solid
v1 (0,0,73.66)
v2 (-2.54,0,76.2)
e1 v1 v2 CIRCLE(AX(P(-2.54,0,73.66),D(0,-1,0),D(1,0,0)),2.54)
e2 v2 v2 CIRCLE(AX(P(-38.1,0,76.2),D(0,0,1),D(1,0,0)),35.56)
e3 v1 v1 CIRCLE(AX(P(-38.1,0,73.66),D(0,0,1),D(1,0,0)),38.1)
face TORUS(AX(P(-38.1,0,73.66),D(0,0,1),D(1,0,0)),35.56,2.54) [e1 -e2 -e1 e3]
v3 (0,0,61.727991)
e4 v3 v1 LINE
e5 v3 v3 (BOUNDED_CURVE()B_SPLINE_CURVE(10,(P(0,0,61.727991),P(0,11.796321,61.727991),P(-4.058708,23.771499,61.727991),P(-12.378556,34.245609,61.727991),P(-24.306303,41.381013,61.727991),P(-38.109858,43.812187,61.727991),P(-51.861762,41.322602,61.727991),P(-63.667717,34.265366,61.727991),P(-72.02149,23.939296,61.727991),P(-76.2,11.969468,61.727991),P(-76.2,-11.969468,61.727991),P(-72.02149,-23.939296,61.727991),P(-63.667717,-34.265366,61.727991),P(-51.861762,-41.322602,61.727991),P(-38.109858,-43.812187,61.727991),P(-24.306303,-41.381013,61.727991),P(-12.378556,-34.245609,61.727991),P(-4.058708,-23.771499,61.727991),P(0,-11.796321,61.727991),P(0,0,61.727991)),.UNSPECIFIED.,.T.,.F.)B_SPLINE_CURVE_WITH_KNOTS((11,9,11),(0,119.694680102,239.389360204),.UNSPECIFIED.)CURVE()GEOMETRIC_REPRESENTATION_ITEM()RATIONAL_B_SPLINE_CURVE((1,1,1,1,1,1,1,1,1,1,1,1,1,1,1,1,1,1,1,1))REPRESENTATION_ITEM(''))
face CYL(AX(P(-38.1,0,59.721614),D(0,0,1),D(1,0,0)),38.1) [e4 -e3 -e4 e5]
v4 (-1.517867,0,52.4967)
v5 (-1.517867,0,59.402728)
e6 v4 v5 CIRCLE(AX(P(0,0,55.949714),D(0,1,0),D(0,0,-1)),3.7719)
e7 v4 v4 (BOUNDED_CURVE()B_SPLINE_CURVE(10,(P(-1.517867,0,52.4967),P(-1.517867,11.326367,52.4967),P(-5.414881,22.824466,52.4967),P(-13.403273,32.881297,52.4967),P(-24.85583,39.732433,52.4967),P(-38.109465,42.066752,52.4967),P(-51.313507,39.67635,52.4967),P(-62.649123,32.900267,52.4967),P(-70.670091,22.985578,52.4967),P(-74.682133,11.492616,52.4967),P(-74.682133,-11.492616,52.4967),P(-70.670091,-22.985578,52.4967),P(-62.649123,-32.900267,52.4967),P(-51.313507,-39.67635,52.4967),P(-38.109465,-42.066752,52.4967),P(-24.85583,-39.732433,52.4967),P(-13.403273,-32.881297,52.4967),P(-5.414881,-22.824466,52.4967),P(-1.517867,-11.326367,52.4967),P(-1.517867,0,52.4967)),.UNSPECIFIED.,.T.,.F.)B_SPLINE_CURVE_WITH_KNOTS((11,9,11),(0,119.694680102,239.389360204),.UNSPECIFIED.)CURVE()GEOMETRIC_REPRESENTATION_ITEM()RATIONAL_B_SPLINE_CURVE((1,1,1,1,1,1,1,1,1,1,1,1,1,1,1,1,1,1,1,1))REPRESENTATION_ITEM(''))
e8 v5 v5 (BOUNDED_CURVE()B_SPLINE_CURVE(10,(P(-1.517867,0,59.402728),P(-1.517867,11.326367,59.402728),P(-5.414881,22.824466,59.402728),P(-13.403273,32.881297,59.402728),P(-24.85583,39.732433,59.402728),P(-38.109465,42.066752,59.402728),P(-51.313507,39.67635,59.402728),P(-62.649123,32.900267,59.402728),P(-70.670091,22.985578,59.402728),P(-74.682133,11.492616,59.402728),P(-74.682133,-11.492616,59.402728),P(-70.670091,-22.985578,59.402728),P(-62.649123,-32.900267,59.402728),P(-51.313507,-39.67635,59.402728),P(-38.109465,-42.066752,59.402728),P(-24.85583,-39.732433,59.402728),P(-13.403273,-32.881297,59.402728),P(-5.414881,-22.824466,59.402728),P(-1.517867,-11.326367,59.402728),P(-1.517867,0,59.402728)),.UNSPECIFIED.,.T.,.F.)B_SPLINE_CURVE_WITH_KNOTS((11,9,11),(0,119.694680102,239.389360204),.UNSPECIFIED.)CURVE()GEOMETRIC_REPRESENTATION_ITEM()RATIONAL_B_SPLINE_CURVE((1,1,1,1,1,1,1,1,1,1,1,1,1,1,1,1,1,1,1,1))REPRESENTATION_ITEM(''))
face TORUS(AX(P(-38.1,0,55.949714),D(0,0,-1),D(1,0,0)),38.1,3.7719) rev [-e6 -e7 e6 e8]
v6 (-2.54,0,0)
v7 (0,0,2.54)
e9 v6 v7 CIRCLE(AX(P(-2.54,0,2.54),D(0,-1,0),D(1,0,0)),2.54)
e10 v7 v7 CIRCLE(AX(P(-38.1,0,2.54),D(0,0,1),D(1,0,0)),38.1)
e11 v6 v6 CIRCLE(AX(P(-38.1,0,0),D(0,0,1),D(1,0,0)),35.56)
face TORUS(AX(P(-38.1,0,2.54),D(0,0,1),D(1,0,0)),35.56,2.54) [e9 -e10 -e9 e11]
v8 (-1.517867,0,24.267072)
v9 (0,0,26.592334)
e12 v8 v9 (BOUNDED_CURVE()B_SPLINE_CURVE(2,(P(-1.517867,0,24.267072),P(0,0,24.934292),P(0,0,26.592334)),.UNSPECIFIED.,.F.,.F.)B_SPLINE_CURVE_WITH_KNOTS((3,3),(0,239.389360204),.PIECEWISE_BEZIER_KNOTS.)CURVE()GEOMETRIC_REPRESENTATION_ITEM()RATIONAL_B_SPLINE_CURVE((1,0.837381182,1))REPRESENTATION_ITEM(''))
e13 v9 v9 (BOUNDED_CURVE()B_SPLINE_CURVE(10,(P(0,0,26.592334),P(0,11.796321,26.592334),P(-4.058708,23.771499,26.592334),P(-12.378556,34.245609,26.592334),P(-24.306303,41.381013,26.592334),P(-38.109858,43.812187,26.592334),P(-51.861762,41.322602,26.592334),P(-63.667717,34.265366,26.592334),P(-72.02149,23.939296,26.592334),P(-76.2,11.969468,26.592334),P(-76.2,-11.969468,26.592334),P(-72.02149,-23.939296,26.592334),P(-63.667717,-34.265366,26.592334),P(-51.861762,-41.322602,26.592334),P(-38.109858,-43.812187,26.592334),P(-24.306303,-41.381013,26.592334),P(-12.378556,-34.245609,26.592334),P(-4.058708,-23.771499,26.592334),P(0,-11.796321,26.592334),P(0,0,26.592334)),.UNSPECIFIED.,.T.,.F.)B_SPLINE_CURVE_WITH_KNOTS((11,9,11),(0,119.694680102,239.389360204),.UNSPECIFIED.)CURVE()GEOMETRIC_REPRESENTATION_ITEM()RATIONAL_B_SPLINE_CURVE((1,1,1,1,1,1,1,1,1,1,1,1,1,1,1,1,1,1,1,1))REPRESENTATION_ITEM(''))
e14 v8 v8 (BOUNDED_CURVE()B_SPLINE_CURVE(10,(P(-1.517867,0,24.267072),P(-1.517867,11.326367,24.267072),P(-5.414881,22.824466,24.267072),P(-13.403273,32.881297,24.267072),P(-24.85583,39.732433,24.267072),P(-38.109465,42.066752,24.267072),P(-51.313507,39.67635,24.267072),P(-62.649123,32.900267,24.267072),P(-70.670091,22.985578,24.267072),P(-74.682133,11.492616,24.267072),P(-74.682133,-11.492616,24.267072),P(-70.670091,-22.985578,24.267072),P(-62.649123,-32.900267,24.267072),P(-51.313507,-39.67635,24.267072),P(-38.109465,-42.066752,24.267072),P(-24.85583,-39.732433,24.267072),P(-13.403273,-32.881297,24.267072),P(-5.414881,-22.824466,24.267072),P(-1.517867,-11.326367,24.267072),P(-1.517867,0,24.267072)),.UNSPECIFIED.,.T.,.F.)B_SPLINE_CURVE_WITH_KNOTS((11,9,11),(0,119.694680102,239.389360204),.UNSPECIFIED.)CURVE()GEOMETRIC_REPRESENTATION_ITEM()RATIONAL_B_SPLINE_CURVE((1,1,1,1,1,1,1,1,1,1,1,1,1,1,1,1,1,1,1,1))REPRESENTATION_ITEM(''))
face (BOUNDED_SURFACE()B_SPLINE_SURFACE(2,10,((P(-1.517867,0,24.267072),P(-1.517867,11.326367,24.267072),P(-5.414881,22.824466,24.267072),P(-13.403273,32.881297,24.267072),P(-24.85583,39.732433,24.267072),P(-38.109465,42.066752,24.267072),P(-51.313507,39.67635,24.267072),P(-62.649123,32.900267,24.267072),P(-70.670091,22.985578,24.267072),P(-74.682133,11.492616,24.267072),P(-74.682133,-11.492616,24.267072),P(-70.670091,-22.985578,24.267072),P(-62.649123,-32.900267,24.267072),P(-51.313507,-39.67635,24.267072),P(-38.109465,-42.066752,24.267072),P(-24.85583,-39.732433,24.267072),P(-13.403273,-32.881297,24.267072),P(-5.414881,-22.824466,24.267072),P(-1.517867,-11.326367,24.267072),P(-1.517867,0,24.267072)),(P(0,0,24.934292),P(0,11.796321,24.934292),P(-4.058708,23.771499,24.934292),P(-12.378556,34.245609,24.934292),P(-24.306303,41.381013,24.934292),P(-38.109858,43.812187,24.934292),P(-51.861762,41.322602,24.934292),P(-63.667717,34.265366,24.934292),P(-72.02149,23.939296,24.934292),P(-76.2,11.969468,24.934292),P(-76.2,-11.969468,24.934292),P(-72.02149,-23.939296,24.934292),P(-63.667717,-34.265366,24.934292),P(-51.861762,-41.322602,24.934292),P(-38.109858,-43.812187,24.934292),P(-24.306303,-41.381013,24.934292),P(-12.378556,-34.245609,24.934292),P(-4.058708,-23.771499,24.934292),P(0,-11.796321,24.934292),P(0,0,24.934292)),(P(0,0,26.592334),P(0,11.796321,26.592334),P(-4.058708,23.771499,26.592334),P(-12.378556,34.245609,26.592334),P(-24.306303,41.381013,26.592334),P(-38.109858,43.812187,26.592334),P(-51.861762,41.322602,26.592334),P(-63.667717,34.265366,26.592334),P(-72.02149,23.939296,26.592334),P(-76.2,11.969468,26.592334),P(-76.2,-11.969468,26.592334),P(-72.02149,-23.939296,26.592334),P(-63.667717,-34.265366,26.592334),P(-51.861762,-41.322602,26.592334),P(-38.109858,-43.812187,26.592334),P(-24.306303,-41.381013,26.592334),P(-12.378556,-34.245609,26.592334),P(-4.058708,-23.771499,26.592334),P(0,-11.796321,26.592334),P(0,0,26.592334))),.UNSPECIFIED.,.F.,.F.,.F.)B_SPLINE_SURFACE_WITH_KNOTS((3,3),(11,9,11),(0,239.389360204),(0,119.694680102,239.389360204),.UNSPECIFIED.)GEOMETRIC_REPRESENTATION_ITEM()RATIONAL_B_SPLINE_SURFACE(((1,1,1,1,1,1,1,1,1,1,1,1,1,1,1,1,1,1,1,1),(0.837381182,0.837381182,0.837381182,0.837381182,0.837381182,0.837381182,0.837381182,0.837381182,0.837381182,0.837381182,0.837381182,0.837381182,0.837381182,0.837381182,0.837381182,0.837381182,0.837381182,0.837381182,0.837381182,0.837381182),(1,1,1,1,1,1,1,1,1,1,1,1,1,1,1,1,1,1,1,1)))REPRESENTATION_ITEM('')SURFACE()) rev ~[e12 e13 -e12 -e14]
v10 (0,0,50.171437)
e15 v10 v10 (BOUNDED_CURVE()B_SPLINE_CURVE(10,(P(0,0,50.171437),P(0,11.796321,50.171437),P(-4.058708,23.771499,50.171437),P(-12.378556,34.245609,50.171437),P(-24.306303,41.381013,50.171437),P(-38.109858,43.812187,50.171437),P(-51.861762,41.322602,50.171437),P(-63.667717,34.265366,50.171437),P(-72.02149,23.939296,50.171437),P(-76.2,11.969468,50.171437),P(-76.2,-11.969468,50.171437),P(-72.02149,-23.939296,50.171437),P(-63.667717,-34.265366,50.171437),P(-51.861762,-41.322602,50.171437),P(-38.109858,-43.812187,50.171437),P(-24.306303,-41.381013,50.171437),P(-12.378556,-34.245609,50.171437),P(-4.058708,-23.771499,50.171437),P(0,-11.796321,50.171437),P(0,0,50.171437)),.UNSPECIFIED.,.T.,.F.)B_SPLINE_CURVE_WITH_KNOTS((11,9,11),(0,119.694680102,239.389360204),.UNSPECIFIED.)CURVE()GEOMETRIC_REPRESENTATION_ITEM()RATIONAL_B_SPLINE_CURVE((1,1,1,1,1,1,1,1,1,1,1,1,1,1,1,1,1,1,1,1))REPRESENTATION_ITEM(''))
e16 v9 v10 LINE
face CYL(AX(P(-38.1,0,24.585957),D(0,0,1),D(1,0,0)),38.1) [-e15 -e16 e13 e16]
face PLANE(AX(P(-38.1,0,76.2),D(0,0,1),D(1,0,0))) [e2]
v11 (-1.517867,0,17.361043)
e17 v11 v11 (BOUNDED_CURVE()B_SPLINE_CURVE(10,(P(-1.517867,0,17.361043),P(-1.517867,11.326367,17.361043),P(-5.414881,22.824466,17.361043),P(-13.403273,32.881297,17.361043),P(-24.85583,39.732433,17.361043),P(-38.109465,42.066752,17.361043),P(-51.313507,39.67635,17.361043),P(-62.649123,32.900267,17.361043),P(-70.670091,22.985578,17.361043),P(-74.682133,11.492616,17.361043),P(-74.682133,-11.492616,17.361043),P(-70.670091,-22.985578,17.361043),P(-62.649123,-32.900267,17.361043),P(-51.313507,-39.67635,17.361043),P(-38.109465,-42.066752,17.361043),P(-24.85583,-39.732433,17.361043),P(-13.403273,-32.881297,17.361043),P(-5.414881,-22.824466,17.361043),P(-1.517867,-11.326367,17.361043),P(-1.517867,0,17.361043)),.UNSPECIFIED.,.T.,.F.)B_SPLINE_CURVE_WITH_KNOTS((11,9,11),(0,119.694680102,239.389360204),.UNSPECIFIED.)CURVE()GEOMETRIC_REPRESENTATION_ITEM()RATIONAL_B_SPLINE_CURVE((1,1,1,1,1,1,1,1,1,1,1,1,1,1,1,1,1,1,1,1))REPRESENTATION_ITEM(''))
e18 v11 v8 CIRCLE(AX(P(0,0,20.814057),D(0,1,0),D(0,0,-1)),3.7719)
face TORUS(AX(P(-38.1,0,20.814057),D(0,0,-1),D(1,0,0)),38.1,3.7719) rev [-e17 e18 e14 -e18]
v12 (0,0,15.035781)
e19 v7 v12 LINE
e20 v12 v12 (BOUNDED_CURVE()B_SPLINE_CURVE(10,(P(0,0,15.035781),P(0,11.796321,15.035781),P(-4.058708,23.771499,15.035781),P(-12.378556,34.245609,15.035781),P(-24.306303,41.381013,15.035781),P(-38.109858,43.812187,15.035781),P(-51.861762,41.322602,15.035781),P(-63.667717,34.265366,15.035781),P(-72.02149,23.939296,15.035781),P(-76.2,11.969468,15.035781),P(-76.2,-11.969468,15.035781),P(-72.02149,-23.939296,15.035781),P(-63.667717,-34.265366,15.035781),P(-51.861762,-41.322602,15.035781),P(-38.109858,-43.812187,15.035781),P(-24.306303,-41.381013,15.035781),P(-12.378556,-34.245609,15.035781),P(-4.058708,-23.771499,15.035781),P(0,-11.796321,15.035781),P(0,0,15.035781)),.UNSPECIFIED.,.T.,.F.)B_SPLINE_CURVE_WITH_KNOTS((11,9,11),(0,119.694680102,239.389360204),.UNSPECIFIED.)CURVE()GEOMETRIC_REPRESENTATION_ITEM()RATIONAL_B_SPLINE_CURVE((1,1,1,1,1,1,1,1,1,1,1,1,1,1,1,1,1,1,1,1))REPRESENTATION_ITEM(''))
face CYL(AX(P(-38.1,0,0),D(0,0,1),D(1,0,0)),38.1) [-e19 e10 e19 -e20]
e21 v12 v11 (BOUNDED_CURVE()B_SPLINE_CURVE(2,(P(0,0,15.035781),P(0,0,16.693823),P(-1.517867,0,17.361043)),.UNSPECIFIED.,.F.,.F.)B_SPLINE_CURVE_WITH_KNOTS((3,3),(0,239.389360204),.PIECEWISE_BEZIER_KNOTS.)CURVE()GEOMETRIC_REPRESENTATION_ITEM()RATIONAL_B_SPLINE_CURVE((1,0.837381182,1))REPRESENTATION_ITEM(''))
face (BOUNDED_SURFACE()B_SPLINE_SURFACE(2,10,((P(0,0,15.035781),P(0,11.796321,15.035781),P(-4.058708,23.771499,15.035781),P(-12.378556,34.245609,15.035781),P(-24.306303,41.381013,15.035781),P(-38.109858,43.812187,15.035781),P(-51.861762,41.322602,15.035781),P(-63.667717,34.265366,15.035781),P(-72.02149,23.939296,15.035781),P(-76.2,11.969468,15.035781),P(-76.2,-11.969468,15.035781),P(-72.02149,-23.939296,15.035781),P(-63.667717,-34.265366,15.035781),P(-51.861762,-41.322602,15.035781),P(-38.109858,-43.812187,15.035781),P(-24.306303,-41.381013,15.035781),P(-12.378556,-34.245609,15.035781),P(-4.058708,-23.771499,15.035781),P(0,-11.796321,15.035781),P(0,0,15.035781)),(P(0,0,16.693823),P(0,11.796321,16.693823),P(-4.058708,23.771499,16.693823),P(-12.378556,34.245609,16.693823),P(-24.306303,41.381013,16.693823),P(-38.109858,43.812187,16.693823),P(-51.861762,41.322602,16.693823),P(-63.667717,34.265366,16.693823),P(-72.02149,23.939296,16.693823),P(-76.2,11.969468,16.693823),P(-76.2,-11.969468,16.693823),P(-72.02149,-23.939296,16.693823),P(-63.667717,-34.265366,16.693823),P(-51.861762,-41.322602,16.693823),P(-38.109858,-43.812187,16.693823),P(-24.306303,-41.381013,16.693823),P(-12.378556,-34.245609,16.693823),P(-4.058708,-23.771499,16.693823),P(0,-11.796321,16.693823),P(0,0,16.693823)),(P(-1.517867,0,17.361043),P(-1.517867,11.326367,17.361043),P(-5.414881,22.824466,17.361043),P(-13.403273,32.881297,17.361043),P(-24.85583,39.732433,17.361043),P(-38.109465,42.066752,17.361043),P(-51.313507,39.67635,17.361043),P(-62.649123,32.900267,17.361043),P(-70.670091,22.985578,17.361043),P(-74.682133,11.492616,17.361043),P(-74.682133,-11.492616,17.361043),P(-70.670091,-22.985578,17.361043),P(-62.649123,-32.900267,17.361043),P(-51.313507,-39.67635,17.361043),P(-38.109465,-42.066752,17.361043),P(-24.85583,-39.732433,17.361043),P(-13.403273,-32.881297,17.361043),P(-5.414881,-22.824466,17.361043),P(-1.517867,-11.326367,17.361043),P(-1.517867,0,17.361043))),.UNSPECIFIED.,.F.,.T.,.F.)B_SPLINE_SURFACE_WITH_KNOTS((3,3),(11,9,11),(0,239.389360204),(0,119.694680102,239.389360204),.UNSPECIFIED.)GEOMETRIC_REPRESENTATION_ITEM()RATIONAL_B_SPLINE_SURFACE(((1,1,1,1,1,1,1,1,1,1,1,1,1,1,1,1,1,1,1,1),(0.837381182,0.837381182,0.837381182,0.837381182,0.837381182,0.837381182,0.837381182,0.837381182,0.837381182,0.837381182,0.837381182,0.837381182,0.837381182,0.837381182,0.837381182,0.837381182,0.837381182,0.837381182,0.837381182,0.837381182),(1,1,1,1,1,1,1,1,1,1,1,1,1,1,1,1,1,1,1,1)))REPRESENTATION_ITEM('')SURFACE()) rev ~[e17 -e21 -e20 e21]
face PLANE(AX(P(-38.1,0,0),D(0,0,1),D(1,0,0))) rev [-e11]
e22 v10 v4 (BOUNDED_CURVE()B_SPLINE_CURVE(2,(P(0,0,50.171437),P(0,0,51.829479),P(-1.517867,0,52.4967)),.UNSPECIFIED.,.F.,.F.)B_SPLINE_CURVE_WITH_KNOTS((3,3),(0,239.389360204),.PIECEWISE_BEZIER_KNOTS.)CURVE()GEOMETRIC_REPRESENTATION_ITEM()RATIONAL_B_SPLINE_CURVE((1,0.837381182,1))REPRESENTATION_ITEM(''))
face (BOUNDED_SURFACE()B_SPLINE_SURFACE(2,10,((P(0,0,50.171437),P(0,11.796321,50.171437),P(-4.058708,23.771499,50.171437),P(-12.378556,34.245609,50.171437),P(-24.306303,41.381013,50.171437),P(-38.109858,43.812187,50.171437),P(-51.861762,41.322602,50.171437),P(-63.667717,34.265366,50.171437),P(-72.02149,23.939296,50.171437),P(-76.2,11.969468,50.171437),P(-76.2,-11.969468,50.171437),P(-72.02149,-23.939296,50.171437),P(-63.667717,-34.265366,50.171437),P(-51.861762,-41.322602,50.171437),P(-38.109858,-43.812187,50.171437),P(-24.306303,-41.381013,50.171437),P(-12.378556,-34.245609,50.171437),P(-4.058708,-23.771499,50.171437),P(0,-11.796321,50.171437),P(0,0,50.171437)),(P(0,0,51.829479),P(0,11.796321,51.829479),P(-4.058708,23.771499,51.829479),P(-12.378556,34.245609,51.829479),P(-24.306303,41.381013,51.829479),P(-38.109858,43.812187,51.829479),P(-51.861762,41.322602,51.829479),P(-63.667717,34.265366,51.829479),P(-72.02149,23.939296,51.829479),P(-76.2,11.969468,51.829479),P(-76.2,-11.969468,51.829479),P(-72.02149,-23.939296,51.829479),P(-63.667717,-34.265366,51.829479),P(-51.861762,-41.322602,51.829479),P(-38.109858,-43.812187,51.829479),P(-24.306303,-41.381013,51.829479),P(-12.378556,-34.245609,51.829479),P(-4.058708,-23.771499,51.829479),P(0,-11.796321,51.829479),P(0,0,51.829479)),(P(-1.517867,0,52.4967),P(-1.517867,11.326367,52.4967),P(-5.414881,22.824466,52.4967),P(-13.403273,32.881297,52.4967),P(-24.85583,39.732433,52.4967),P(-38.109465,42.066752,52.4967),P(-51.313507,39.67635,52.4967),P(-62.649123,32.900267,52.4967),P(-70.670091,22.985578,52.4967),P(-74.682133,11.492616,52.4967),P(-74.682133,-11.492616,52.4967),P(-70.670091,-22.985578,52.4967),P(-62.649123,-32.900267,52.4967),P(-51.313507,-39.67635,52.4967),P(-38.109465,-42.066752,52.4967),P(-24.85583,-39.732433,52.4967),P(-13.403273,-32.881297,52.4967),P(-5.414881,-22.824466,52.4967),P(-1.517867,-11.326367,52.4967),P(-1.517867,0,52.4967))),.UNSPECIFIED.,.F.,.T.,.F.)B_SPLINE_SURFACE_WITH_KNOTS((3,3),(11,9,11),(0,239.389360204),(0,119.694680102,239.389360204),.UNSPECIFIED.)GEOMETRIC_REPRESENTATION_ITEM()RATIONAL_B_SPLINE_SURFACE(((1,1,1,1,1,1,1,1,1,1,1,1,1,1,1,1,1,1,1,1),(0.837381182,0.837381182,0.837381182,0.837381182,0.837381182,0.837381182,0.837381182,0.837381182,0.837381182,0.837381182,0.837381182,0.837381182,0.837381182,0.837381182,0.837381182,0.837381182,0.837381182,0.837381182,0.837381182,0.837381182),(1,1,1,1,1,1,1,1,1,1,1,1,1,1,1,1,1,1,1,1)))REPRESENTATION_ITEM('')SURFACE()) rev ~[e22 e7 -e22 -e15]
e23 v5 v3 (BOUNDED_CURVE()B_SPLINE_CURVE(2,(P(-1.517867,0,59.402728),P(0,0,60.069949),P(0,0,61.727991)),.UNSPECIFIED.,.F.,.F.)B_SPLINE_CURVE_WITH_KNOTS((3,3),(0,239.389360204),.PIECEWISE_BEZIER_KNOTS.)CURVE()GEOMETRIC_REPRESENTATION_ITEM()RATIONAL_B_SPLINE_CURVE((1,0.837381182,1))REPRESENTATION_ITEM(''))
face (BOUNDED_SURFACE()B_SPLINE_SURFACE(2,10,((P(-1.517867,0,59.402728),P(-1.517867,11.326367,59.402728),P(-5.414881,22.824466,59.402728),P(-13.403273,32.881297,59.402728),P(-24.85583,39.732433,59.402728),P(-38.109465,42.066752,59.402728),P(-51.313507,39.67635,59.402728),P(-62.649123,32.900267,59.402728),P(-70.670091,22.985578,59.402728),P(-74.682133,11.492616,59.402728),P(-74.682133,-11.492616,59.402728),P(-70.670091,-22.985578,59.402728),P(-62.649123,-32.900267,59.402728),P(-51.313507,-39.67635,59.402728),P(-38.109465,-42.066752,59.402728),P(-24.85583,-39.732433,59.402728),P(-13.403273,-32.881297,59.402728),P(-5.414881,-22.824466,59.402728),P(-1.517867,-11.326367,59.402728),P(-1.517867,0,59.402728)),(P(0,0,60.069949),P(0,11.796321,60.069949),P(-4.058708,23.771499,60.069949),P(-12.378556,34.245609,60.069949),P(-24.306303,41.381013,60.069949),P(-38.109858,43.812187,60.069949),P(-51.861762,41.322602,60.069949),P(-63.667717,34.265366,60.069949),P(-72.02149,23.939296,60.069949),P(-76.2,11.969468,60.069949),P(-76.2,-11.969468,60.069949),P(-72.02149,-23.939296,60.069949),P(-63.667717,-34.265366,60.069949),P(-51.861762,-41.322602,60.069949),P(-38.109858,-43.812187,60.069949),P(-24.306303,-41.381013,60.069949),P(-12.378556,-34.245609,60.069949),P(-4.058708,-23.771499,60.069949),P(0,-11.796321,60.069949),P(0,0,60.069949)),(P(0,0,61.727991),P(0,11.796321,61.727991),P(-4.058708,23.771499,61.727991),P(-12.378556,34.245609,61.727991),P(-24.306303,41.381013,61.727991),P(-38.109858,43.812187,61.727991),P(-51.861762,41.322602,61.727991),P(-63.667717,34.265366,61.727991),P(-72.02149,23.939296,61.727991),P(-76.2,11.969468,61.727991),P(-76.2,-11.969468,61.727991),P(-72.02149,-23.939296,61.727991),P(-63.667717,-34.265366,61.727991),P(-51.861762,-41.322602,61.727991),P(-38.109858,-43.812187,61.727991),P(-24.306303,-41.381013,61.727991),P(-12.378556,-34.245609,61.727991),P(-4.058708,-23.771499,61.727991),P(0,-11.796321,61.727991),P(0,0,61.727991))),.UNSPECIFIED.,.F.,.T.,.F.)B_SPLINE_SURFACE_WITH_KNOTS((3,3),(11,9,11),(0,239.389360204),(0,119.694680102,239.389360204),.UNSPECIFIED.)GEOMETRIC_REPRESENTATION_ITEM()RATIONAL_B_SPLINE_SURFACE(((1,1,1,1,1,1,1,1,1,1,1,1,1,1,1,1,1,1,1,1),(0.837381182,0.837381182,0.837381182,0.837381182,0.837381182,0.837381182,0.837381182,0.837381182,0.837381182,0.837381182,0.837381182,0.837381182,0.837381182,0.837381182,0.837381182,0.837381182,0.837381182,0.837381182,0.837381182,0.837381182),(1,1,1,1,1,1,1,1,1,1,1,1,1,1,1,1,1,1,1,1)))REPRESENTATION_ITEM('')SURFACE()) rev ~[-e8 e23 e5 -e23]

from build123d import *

# Parameters (mm, degrees)
F2_R = 2.54


with BuildPart() as f1:
    # F0 (on Front) → F1 (revolve)
    with BuildSketch(Plane.XZ):
        with BuildLine():
            Line((-38.1, 0), (0, 0))
            Line((0, 0), (0, 17.0421574396))
            ThreePointArc((0, 17.0421574396), (-3.7719, 20.8140574396), (0, 24.5859574396))
            Line((0, 24.5859574396), (0, 52.1778140348))
            ThreePointArc((0, 52.1778140348), (-3.7719, 55.9497140348), (0, 59.7216140348))
            Line((0, 59.7216140348), (0, 76.2))
            Line((0, 76.2), (-38.1, 76.2))
            Line((-38.1, 76.2), (-38.1, 0))
        make_face()
    revolve(axis=Axis((-38.1, 0, 38.1), (0, 0, 1)))

    # F2
    f2_edges = [f1.edges().sort_by_distance(p)[0] for p in [
        (-76.2, 0, 76.2),
        (-76.2, 0, 59.721614),
        (-76.2, 0, 24.585957),
        (-76.2, 0, 0),
        (-76.2, 0, 17.042157),
        (-76.2, 0, 52.177814),
    ]]
    fillet(f2_edges, radius=F2_R)


solid = f1.part
